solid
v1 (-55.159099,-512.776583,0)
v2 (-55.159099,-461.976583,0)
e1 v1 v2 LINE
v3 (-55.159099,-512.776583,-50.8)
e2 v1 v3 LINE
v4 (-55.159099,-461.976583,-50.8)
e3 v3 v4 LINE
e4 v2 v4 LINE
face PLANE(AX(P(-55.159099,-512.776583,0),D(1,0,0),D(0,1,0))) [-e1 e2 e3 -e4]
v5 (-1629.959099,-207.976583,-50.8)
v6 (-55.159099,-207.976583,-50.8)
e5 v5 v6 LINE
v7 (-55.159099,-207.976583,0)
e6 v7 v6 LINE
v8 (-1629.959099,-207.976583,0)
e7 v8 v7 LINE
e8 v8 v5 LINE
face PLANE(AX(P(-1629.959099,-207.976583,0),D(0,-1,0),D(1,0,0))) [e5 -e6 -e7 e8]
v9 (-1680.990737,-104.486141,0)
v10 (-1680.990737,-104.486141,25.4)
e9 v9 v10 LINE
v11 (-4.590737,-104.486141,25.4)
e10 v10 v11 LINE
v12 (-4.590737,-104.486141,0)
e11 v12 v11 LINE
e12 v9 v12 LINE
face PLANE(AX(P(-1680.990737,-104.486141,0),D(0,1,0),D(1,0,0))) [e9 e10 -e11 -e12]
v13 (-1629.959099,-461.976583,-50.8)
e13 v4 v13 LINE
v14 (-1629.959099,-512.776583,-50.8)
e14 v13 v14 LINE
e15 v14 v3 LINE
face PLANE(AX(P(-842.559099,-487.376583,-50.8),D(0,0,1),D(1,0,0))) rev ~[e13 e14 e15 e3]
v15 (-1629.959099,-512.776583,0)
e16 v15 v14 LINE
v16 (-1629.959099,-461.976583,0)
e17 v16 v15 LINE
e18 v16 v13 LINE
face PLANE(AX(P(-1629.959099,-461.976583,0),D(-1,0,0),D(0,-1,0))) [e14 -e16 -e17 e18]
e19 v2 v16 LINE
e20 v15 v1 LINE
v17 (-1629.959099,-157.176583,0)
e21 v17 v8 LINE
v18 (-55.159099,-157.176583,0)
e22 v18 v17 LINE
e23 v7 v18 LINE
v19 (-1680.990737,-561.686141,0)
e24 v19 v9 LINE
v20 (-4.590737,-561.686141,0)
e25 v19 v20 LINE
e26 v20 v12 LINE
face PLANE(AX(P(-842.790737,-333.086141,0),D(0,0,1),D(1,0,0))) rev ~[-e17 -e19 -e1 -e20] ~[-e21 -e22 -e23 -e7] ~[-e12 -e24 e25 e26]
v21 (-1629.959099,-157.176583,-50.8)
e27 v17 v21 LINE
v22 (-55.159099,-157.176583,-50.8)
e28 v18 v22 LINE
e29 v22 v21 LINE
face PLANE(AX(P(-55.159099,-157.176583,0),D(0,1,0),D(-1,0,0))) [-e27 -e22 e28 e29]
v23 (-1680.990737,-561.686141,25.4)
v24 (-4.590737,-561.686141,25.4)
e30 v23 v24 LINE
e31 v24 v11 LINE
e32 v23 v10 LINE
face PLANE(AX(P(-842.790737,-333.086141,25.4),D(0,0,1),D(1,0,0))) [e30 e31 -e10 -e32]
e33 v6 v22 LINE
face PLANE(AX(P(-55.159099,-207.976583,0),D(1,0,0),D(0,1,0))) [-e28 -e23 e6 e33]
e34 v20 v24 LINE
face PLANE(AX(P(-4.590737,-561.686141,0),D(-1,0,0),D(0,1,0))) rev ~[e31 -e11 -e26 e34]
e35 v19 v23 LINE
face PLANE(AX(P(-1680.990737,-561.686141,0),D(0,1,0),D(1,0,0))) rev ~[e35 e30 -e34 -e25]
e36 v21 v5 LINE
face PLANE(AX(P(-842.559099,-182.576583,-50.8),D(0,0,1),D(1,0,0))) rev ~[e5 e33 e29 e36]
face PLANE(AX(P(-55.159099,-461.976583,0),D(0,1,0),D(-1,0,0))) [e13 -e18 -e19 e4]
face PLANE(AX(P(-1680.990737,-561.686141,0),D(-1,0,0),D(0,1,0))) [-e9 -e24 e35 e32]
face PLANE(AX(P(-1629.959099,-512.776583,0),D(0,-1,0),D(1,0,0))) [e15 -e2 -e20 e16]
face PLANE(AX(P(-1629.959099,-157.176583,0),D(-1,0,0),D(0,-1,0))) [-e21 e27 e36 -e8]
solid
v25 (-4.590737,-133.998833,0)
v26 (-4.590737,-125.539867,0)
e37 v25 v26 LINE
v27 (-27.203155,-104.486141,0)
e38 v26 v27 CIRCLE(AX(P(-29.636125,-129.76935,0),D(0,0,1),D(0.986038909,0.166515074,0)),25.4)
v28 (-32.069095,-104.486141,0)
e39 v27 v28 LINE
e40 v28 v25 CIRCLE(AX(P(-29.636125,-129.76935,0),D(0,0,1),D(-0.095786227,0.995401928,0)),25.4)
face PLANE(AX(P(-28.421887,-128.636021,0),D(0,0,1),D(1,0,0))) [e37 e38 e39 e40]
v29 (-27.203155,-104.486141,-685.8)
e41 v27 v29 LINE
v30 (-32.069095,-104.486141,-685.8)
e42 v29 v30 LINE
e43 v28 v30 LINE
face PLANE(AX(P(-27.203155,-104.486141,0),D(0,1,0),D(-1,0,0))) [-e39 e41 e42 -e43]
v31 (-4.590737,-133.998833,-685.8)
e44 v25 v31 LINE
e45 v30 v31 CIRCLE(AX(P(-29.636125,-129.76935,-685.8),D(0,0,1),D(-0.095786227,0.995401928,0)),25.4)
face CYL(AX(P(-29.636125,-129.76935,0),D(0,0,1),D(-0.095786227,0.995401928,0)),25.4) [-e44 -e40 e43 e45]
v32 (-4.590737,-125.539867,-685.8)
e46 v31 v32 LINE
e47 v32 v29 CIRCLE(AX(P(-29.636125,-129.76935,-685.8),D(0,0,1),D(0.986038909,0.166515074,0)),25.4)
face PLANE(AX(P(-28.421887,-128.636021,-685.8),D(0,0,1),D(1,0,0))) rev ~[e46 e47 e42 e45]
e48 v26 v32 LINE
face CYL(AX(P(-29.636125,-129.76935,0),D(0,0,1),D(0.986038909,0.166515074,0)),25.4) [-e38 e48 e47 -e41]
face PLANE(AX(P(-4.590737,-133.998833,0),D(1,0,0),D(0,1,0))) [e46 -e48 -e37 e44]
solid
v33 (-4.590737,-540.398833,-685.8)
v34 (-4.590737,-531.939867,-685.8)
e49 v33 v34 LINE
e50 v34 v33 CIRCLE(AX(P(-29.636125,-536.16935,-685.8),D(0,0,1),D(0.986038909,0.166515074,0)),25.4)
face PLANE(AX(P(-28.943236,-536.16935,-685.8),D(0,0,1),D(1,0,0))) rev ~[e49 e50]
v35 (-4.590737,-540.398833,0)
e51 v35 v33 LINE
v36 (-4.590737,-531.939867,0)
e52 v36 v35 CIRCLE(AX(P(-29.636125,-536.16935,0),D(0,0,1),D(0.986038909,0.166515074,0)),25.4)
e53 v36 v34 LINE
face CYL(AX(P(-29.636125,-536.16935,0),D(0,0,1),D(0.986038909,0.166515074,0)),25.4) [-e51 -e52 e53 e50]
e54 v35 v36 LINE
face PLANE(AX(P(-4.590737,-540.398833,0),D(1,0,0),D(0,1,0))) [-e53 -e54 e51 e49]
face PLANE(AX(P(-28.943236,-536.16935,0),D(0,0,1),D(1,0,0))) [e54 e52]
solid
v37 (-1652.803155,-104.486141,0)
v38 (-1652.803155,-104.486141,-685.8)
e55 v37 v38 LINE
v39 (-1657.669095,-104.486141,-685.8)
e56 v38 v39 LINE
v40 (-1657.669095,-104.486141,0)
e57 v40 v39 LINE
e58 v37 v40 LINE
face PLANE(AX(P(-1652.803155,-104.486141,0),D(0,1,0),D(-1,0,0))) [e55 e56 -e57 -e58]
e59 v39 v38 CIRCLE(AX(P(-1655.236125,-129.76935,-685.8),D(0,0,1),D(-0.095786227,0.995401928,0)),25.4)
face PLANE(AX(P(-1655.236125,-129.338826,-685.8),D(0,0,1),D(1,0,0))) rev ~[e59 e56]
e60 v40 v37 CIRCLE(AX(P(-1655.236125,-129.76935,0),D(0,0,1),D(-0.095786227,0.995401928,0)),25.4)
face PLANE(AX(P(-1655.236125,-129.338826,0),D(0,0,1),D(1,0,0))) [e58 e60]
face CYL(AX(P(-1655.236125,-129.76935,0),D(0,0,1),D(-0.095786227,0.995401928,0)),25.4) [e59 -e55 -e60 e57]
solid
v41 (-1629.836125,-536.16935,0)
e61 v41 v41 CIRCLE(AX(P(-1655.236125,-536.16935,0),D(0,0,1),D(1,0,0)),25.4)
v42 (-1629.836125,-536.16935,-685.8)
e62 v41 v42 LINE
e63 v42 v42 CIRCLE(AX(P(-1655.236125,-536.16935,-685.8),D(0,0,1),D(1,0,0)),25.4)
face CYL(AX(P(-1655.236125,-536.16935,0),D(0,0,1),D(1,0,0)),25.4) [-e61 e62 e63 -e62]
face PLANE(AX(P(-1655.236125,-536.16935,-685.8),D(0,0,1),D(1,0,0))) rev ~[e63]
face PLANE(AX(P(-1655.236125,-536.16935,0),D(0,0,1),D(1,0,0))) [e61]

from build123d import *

# Parameters (mm, degrees)
F0_W     = 1676.4
F0_H     = 457.2
F1_DEPTH = 25.4
F2_R     = 25.4
F3_DEPTH = 685.8
F5_DEPTH = 50.8


with BuildPart() as f1:
    # F0 (on Top) → F1 (new body)
    with BuildSketch(Plane.XY):
        with Locations((-842.7907367021, -333.0861411702)):
            Rectangle(F0_W, F0_H)
    extrude(amount=F1_DEPTH)

    # F4 (on face) → F5 (join)
    with BuildSketch(Plane.XY):
        Polygon((-1629.9590991974, -461.9765826102), (-1629.9590991974, -512.7765826102), (-1604.5590991974, -512.7765826102), (-1579.1590991974, -512.7765826102), (-55.1590991974, -512.7765826102), (-55.1590991974, -461.9765826102), (-1579.1590991974, -461.9765826102), (-1604.5590991974, -461.9765826102), align=None)
        Polygon((-1579.1590991974, -207.9765826102), (-55.1590991974, -207.9765826102), (-55.1590991974, -157.1765826102), (-1579.1590991974, -157.1765826102), (-1604.5590991974, -157.1765826102), (-1629.9590991974, -157.1765826102), (-1629.9590991974, -207.9765826102), (-1604.5590991974, -207.9765826102), align=None)
    extrude(amount=-F5_DEPTH)


with BuildPart() as f3:
    # F2 (on face) → F3 (new body)
    with BuildSketch(Plane.XY):
        with Locations((-1655.2361249924, -536.1693501472)):
            Circle(F2_R)
    extrude(amount=-F3_DEPTH)


with BuildPart() as f3b:
    # F2 (on face) → F3, piece 2 (new body)
    with BuildSketch(Plane.XY):
        with BuildLine():
            ThreePointArc((-1657.6690951571, -104.4861411702), (-1672.3148040662, -148.5703799353), (-1629.8361249924, -129.7693501472))
            ThreePointArc((-1629.8361249924, -129.7693501472), (-1636.4350952043, -112.6906710734), (-1652.8031548277, -104.4861411702))
            Line((-1652.8031548277, -104.4861411702), (-1657.6690951571, -104.4861411702))
        make_face()
    extrude(amount=-F3_DEPTH)


with BuildPart() as f3c:
    # F2 (on face) → F3, piece 3 (new body)
    with BuildSketch(Plane.XY):
        with BuildLine():
            Line((-27.2031548277, -104.4861411702), (-32.0690951571, -104.4861411702))
            ThreePointArc((-32.0690951571, -104.4861411702), (-48.2259100492, -147.0777264877), (-4.5907367021, -133.9988330221))
            Line((-4.5907367021, -133.9988330221), (-4.5907367021, -125.5398672724))
            ThreePointArc((-4.5907367021, -125.5398672724), (-12.3277486519, -111.1795650904), (-27.2031548277, -104.4861411702))
        make_face()
    extrude(amount=-F3_DEPTH)


with BuildPart() as f3d:
    # F2 (on face) → F3, piece 4 (new body)
    with BuildSketch(Plane.XY):
        with BuildLine():
            Line((-4.5907367021, -540.3988330221), (-4.5907367021, -531.9398672724))
            ThreePointArc((-4.5907367021, -531.9398672724), (-55.0361249924, -536.1693501472), (-4.5907367021, -540.3988330221))
        make_face()
    extrude(amount=-F3_DEPTH)


solid = Compound([f1.part, f3.part, f3b.part, f3c.part, f3d.part])
